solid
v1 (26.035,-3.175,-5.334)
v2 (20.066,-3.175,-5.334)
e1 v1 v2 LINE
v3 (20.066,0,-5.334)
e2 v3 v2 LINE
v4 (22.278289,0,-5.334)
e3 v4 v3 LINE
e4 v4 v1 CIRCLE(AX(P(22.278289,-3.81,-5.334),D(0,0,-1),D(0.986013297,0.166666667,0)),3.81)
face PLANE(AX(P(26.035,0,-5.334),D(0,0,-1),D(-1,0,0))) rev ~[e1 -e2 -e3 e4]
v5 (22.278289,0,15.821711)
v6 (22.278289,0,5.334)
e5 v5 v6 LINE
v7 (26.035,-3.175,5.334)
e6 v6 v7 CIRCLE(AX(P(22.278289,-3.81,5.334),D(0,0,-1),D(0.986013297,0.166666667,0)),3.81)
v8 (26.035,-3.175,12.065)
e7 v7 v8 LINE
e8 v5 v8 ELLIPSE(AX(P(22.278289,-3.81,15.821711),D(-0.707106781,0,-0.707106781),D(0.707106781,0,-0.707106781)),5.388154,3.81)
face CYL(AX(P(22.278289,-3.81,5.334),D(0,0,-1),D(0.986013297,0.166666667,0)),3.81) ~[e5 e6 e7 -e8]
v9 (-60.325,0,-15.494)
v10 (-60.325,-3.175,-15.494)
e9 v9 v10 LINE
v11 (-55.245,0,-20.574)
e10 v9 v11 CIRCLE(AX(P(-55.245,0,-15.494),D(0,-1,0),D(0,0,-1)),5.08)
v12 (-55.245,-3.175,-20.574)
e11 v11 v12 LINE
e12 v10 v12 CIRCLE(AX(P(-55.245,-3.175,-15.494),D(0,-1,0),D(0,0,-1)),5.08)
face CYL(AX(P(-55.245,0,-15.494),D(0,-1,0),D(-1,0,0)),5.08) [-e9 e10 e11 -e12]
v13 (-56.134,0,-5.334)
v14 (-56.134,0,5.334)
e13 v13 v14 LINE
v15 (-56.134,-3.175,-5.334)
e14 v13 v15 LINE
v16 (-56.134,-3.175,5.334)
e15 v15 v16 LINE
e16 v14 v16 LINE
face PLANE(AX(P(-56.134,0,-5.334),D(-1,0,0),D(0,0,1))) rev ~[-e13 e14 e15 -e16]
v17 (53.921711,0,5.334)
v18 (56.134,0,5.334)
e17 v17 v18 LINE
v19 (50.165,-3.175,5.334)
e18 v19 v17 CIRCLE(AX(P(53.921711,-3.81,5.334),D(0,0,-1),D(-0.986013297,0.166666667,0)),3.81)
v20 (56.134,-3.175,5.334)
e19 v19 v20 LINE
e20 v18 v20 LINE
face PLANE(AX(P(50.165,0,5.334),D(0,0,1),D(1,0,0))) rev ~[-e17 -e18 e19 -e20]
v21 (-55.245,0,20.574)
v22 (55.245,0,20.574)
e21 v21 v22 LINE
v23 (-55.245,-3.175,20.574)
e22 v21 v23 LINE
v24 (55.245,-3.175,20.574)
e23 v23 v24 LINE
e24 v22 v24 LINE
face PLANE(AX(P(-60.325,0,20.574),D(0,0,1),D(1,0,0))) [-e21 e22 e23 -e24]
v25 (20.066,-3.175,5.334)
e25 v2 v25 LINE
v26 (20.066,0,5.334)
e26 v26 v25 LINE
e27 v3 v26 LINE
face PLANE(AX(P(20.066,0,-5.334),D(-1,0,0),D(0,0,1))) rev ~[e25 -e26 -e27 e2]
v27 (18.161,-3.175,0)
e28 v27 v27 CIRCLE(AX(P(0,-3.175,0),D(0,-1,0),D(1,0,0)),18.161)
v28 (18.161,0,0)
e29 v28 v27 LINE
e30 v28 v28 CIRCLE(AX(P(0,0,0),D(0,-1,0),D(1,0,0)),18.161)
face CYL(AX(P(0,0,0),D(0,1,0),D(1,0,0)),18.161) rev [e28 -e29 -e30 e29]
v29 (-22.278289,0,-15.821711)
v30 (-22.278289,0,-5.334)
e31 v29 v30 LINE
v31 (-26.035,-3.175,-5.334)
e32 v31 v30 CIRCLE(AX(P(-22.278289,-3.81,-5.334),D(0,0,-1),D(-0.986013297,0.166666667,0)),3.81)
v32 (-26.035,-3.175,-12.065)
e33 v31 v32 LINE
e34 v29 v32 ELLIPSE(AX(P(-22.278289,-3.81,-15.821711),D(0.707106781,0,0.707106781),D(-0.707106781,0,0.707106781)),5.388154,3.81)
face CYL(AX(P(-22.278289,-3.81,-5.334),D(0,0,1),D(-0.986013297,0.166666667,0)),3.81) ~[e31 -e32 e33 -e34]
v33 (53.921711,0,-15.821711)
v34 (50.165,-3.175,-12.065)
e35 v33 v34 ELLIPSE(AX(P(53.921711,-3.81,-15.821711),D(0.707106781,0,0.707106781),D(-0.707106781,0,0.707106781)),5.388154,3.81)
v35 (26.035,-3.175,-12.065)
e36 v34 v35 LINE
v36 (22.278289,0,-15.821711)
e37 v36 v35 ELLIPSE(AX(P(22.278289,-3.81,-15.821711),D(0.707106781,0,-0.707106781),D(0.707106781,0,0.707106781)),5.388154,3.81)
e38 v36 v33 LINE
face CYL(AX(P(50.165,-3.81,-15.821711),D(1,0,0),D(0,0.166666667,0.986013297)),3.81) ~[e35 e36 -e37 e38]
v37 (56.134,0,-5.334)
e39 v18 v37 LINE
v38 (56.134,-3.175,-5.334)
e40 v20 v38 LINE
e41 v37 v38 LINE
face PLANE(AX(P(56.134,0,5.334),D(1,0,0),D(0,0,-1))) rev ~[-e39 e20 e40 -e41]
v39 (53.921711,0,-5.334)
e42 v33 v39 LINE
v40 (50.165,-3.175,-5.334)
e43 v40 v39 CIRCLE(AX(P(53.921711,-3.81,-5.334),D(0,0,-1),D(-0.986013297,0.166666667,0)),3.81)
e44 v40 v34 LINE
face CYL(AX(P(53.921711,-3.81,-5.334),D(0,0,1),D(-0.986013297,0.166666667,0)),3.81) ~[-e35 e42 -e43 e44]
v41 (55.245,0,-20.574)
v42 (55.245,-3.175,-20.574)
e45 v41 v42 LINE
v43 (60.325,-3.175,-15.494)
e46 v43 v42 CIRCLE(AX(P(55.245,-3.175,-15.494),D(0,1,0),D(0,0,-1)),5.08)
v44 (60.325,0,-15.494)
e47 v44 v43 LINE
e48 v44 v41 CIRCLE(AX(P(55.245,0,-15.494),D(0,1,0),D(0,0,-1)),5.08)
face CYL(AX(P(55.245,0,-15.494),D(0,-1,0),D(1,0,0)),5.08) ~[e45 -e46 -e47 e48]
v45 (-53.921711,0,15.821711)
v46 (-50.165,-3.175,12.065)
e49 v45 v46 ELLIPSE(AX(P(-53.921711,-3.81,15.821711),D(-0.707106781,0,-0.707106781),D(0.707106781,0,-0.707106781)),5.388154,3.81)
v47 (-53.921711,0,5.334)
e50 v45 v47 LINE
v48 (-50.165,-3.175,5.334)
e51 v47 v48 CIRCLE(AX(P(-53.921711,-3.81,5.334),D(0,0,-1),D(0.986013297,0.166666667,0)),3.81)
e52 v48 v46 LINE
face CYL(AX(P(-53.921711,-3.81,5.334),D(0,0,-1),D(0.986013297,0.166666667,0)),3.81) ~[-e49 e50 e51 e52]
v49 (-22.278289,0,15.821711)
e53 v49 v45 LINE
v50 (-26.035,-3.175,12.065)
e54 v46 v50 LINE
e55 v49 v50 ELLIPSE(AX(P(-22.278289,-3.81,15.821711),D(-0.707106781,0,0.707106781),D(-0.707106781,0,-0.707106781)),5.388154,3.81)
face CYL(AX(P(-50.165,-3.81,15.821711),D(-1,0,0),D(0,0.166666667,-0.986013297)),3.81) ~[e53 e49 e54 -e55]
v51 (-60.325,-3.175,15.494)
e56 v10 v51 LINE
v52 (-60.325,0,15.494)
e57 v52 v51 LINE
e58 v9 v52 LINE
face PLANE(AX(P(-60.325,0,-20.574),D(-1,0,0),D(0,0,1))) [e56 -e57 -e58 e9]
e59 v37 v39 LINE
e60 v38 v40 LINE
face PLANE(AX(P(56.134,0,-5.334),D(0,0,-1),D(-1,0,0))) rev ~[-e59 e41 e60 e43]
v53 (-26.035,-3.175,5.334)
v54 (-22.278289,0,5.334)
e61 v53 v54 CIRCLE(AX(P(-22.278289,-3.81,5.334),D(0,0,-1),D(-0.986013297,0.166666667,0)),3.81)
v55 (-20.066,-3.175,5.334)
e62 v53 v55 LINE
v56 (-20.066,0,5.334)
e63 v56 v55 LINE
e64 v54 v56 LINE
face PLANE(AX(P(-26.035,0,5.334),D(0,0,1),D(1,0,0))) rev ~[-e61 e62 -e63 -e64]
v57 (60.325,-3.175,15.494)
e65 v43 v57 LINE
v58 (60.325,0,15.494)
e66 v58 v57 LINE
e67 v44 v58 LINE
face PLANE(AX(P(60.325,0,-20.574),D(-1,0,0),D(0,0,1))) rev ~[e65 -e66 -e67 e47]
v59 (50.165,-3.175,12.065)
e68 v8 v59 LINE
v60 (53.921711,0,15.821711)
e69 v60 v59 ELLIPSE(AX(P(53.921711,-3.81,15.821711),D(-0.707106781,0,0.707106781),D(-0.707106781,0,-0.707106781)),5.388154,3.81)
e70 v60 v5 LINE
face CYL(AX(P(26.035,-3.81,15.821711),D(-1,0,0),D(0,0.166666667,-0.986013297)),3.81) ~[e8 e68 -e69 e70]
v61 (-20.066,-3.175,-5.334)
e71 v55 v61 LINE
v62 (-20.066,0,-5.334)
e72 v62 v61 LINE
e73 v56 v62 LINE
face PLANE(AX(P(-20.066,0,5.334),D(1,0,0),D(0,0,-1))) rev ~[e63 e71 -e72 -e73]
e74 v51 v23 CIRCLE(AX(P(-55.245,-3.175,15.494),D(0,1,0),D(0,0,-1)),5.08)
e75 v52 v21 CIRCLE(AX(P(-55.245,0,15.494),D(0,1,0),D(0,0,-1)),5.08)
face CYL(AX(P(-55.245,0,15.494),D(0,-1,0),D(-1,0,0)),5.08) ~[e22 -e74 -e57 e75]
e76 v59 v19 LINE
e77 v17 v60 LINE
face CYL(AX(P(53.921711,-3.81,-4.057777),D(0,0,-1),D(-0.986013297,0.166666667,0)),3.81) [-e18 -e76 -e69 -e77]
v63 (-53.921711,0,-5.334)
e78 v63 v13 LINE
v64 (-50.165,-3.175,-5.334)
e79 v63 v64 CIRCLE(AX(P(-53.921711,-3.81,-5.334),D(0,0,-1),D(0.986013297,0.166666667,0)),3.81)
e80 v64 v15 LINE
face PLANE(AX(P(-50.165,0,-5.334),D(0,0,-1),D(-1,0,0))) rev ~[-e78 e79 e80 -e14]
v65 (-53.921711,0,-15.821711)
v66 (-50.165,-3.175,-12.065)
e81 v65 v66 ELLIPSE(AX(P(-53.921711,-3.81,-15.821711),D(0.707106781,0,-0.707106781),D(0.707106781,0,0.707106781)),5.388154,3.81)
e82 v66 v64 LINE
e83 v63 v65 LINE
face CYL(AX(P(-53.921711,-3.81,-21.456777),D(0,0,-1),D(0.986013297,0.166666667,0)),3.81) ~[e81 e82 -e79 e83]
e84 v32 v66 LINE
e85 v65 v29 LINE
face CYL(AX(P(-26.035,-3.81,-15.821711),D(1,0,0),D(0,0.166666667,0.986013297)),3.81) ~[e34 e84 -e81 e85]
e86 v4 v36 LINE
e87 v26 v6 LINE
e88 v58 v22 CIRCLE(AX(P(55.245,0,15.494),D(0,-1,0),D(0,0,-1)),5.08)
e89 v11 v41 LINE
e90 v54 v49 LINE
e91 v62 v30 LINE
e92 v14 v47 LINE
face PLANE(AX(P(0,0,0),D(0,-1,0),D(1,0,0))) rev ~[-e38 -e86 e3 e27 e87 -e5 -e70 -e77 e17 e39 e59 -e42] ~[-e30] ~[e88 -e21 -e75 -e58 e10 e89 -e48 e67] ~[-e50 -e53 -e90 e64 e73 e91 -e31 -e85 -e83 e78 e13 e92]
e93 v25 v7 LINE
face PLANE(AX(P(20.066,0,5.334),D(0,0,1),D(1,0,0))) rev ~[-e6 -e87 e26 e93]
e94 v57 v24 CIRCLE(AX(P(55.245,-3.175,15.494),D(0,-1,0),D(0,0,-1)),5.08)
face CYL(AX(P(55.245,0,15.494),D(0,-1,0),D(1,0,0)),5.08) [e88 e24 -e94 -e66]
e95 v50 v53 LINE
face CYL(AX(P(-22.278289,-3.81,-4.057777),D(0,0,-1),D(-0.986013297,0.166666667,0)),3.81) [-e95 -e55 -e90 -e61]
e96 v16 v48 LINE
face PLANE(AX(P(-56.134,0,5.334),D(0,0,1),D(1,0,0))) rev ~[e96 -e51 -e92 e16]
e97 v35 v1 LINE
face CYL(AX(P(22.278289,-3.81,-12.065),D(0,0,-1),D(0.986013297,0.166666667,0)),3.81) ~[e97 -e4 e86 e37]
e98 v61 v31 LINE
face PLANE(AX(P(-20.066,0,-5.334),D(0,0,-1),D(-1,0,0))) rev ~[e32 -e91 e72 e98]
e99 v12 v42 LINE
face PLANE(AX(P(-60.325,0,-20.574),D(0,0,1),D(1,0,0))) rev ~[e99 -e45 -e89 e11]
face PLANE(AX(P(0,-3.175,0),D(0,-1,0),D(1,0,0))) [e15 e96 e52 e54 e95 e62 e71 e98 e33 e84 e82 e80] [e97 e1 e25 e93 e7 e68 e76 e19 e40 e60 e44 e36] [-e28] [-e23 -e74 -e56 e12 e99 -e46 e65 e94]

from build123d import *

# Parameters (mm, degrees)
F0_W          = 120.65
F0_H          = 41.148
F0_R          = 18.161
F1_DEPTH      = 3.175
F2_T1_DEPTH   = 24.13
F2_T3_DEPTH   = 16.1227766557
F2_T5_DEPTH   = 24.13
F2_T7_DEPTH   = 16.1227766557
F2_T13_DEPTH  = 16.1227766557
F2_T18_DEPTH  = 33.5217766557
F2_T25_DEPTH  = 33.5217766557
F2_T29_DEPTH  = 16.1227766557
F2_T37_DEPTH  = 33.5217766557
F2_T41_DEPTH  = 16.1227766557
F2_T49_DEPTH  = 16.1227766557
F2_T54_DEPTH  = 33.5217766557
F2_T61_DEPTH  = 33.5217766557
F2_T65_DEPTH  = 16.1227766557
F2_T73_DEPTH  = 16.1227766557
F2_T78_DEPTH  = 33.5217766557
F2_T85_DEPTH  = 33.5217766557
F2_T89_DEPTH  = 16.1227766557
F2_T97_DEPTH  = 16.1227766557
F2_T102_DEPTH = 33.5217766557
F3_R          = 5.08


# Not quite as in the source:
# - a fillet or chamfer that OpenCascade refuses, or shapes differently, is made with other operations: its cross-section is extruded or revolved along the edge and cut away or added
# - a feature names something its author has since deleted; it is built from what else it names


with BuildPart() as f1:
    # F0 (on Front) → F1 (new body)
    with BuildSketch(Plane.XZ):
        Rectangle(F0_W, F0_H)
        Polygon((-26.035, 5.334), (-20.066, 5.334), (-20.066, -5.334), (-26.035, -5.334), (-26.035, -12.065), (-50.165, -12.065), (-50.165, -5.334), (-56.134, -5.334), (-56.134, 5.334), (-50.165, 5.334), (-50.165, 12.065), (-26.035, 12.065), align=None, mode=Mode.SUBTRACT)
        Circle(F0_R, mode=Mode.SUBTRACT)
        Polygon((50.165, 5.334), (56.134, 5.334), (56.134, -5.334), (50.165, -5.334), (50.165, -12.065), (26.035, -12.065), (26.035, -5.334), (20.066, -5.334), (20.066, 5.334), (26.035, 5.334), (26.035, 12.065), (50.165, 12.065), align=None, mode=Mode.SUBTRACT)
    extrude(amount=F1_DEPTH)

    # F2: fillet of radius 3.81 on 12 edges, made by hand

    # F2_s2 → F2_t1 (cut)
    with BuildSketch(Plane.YZ.offset(26.035)):
        with BuildLine():
            ThreePointArc((-3.175, 12.065), (-0.9000644337, 13.3623662374), (0, 15.8217106623))
            Line((0, 15.8217106623), (0, 12.065))
            Line((0, 12.065), (-3.175, 12.065))
        make_face()
        with BuildLine():
            ThreePointArc((-3.175, -12.065), (-0.9000644337, -13.3623662374), (0, -15.8217106623))
            Line((0, -15.8217106623), (0, -12.065))
            Line((0, -12.065), (-3.175, -12.065))
        make_face()
    extrude(amount=F2_T1_DEPTH, mode=Mode.SUBTRACT)

    # F2_s4 → F2_t3 (cut)
    with BuildSketch(Plane.XY.offset(-4.0577766557)):
        with BuildLine():
            ThreePointArc((26.035, -3.175), (24.7376337626, -0.9000644337), (22.2782893377, 0))
            Line((22.2782893377, 0), (26.035, 0))
            Line((26.035, 0), (26.035, -3.175))
        make_face()
        with BuildLine():
            ThreePointArc((50.165, -3.175), (51.4623662374, -0.9000644337), (53.9217106623, 0))
            Line((53.9217106623, 0), (50.165, 0))
            Line((50.165, 0), (50.165, -3.175))
        make_face()
        with BuildLine():
            ThreePointArc((-26.035, -3.175), (-24.7376337626, -0.9000644337), (-22.2782893377, 0))
            Line((-22.2782893377, 0), (-26.035, 0))
            Line((-26.035, 0), (-26.035, -3.175))
        make_face()
        with BuildLine():
            ThreePointArc((-50.165, -3.175), (-51.4623662374, -0.9000644337), (-53.9217106623, 0))
            Line((-53.9217106623, 0), (-50.165, 0))
            Line((-50.165, 0), (-50.165, -3.175))
        make_face()
    extrude(amount=F2_T3_DEPTH, mode=Mode.SUBTRACT)

    # F2_s6 → F2_t5 (cut)
    with BuildSketch(Plane.YZ.offset(-50.165)):
        with BuildLine():
            ThreePointArc((-3.175, 12.065), (-0.9000644337, 13.3623662374), (0, 15.8217106623))
            Line((0, 15.8217106623), (0, 12.065))
            Line((0, 12.065), (-3.175, 12.065))
        make_face()
        with BuildLine():
            ThreePointArc((-3.175, -12.065), (-0.9000644337, -13.3623662374), (0, -15.8217106623))
            Line((0, -15.8217106623), (0, -12.065))
            Line((0, -12.065), (-3.175, -12.065))
        make_face()
    extrude(amount=F2_T5_DEPTH, mode=Mode.SUBTRACT)

    # F2_s8 → F2_t7 (cut)
    with BuildSketch(Plane.XY.offset(-12.065)):
        with BuildLine():
            ThreePointArc((-50.165, -3.175), (-51.4623662374, -0.9000644337), (-53.9217106623, 0))
            Line((-53.9217106623, 0), (-50.165, 0))
            Line((-50.165, 0), (-50.165, -3.175))
        make_face()
        with BuildLine():
            ThreePointArc((-26.035, -3.175), (-24.7376337626, -0.9000644337), (-22.2782893377, 0))
            Line((-22.2782893377, 0), (-26.035, 0))
            Line((-26.035, 0), (-26.035, -3.175))
        make_face()
        with BuildLine():
            ThreePointArc((26.035, -3.175), (24.7376337626, -0.9000644337), (22.2782893377, 0))
            Line((22.2782893377, 0), (26.035, 0))
            Line((26.035, 0), (26.035, -3.175))
        make_face()
        with BuildLine():
            ThreePointArc((50.165, -3.175), (51.4623662374, -0.9000644337), (53.9217106623, 0))
            Line((53.9217106623, 0), (50.165, 0))
            Line((50.165, 0), (50.165, -3.175))
        make_face()
    extrude(amount=F2_T7_DEPTH, mode=Mode.SUBTRACT)


with BuildPart() as f2_tool11:
    # F2_s12 → F2_t13 (new body)
    with BuildSketch(Plane.XY.offset(5.334)):
        with BuildLine():
            ThreePointArc((26.035, -3.175), (24.7376337626, -0.9000644337), (22.2782893377, 0))
            Line((22.2782893377, 0), (26.035, 0))
            Line((26.035, 0), (26.035, -3.175))
        make_face()
    extrude(amount=F2_T13_DEPTH)

    split(bisect_by=Plane.XY.offset(20.574), keep=Keep.BOTTOM)

    split(bisect_by=Plane.XY.offset(12.065), keep=Keep.TOP)


with BuildPart() as f2_tool16:
    # F2_s17 → F2_t18 (new body)
    with BuildSketch(Plane.YZ.offset(16.6432233443)):
        with BuildLine():
            ThreePointArc((-3.175, 12.065), (-0.9000644337, 13.3623662374), (0, 15.8217106623))
            Line((0, 15.8217106623), (0, 12.065))
            Line((0, 12.065), (-3.175, 12.065))
        make_face()
    extrude(amount=F2_T18_DEPTH)

    split(bisect_by=Plane.YZ.offset(26.035), keep=Keep.BOTTOM)


with BuildPart() as f2_tool11_1:
    add(f2_tool11.part)

    # F2_t20: intersect F2_tool16
    add(f2_tool16.part, mode=Mode.INTERSECT)


with BuildPart() as f1_1:
    add(f1.part)

    # F2_t9: cut F2_tool11
    add(f2_tool11_1.part, mode=Mode.SUBTRACT)


with BuildPart() as f2_tool23:
    # F2_s24 → F2_t25 (new body)
    with BuildSketch(Plane.YZ.offset(26.035)):
        with BuildLine():
            ThreePointArc((-3.175, 12.065), (-0.9000644337, 13.3623662374), (0, 15.8217106623))
            Line((0, 15.8217106623), (0, 12.065))
            Line((0, 12.065), (-3.175, 12.065))
        make_face()
    extrude(amount=F2_T25_DEPTH)

    split(bisect_by=Plane.YZ.offset(50.165), keep=Keep.TOP)


with BuildPart() as f2_tool27:
    # F2_s28 → F2_t29 (new body)
    with BuildSketch(Plane.XY.offset(21.4567766557)):
        with BuildLine():
            ThreePointArc((50.165, -3.175), (51.4623662374, -0.9000644337), (53.9217106623, 0))
            Line((53.9217106623, 0), (50.165, 0))
            Line((50.165, 0), (50.165, -3.175))
        make_face()
    extrude(amount=-F2_T29_DEPTH)

    split(bisect_by=Plane.XY.offset(20.574), keep=Keep.BOTTOM)

    split(bisect_by=Plane.XY.offset(12.065), keep=Keep.TOP)


with BuildPart() as f2_tool23_1:
    add(f2_tool23.part)

    # F2_t32: intersect F2_tool27
    add(f2_tool27.part, mode=Mode.INTERSECT)


with BuildPart() as f1_2:
    add(f1_1.part)

    # F2_t21: cut F2_tool23
    add(f2_tool23_1.part, mode=Mode.SUBTRACT)


with BuildPart() as f2_tool35:
    # F2_s36 → F2_t37 (new body)
    with BuildSketch(Plane.YZ.offset(-50.165)):
        with BuildLine():
            ThreePointArc((-3.175, 12.065), (-0.9000644337, 13.3623662374), (0, 15.8217106623))
            Line((0, 15.8217106623), (0, 12.065))
            Line((0, 12.065), (-3.175, 12.065))
        make_face()
    extrude(amount=F2_T37_DEPTH)

    split(bisect_by=Plane.YZ.offset(-26.035), keep=Keep.TOP)


with BuildPart() as f2_tool39:
    # F2_s40 → F2_t41 (new body)
    with BuildSketch(Plane.XY.offset(21.4567766557)):
        with BuildLine():
            ThreePointArc((-26.035, -3.175), (-24.7376337626, -0.9000644337), (-22.2782893377, 0))
            Line((-22.2782893377, 0), (-26.035, 0))
            Line((-26.035, 0), (-26.035, -3.175))
        make_face()
    extrude(amount=-F2_T41_DEPTH)

    split(bisect_by=Plane.XY.offset(20.574), keep=Keep.BOTTOM)

    split(bisect_by=Plane.XY.offset(12.065), keep=Keep.TOP)


with BuildPart() as f2_tool35_1:
    add(f2_tool35.part)

    # F2_t44: intersect F2_tool39
    add(f2_tool39.part, mode=Mode.INTERSECT)


with BuildPart() as f1_3:
    add(f1_2.part)

    # F2_t33: cut F2_tool35
    add(f2_tool35_1.part, mode=Mode.SUBTRACT)


with BuildPart() as f2_tool47:
    # F2_s48 → F2_t49 (new body)
    with BuildSketch(Plane.XY.offset(5.334)):
        with BuildLine():
            ThreePointArc((-50.165, -3.175), (-51.4623662374, -0.9000644337), (-53.9217106623, 0))
            Line((-53.9217106623, 0), (-50.165, 0))
            Line((-50.165, 0), (-50.165, -3.175))
        make_face()
    extrude(amount=F2_T49_DEPTH)

    split(bisect_by=Plane.XY.offset(20.574), keep=Keep.BOTTOM)

    split(bisect_by=Plane.XY.offset(12.065), keep=Keep.TOP)


with BuildPart() as f2_tool52:
    # F2_s53 → F2_t54 (new body)
    with BuildSketch(Plane.YZ.offset(-59.5567766557)):
        with BuildLine():
            ThreePointArc((-3.175, 12.065), (-0.9000644337, 13.3623662374), (0, 15.8217106623))
            Line((0, 15.8217106623), (0, 12.065))
            Line((0, 12.065), (-3.175, 12.065))
        make_face()
    extrude(amount=F2_T54_DEPTH)

    split(bisect_by=Plane.YZ.offset(-50.165), keep=Keep.BOTTOM)


with BuildPart() as f2_tool47_1:
    add(f2_tool47.part)

    # F2_t56: intersect F2_tool52
    add(f2_tool52.part, mode=Mode.INTERSECT)


with BuildPart() as f1_4:
    add(f1_3.part)

    # F2_t45: cut F2_tool47
    add(f2_tool47_1.part, mode=Mode.SUBTRACT)


with BuildPart() as f2_tool59:
    # F2_s60 → F2_t61 (new body)
    with BuildSketch(Plane.YZ.offset(-26.035)):
        with BuildLine():
            ThreePointArc((-3.175, -12.065), (-0.9000644337, -13.3623662374), (0, -15.8217106623))
            Line((0, -15.8217106623), (0, -12.065))
            Line((0, -12.065), (-3.175, -12.065))
        make_face()
    extrude(amount=-F2_T61_DEPTH)

    split(bisect_by=Plane.YZ.offset(-50.165), keep=Keep.BOTTOM)


with BuildPart() as f2_tool63:
    # F2_s64 → F2_t65 (new body)
    with BuildSketch(Plane.XY.offset(-21.4567766557)):
        with BuildLine():
            ThreePointArc((-50.165, -3.175), (-51.4623662374, -0.9000644337), (-53.9217106623, 0))
            Line((-53.9217106623, 0), (-50.165, 0))
            Line((-50.165, 0), (-50.165, -3.175))
        make_face()
    extrude(amount=F2_T65_DEPTH)

    split(bisect_by=Plane.XY.offset(-20.574), keep=Keep.TOP)

    split(bisect_by=Plane.XY.offset(-12.065), keep=Keep.BOTTOM)


with BuildPart() as f2_tool59_1:
    add(f2_tool59.part)

    # F2_t68: intersect F2_tool63
    add(f2_tool63.part, mode=Mode.INTERSECT)


with BuildPart() as f1_5:
    add(f1_4.part)

    # F2_t57: cut F2_tool59
    add(f2_tool59_1.part, mode=Mode.SUBTRACT)


with BuildPart() as f2_tool71:
    # F2_s72 → F2_t73 (new body)
    with BuildSketch(Plane.XY.offset(-5.334)):
        with BuildLine():
            ThreePointArc((-26.035, -3.175), (-24.7376337626, -0.9000644337), (-22.2782893377, 0))
            Line((-22.2782893377, 0), (-26.035, 0))
            Line((-26.035, 0), (-26.035, -3.175))
        make_face()
    extrude(amount=-F2_T73_DEPTH)

    split(bisect_by=Plane.XY.offset(-20.574), keep=Keep.TOP)

    split(bisect_by=Plane.XY.offset(-12.065), keep=Keep.BOTTOM)


with BuildPart() as f2_tool76:
    # F2_s77 → F2_t78 (new body)
    with BuildSketch(Plane.YZ.offset(-16.6432233443)):
        with BuildLine():
            ThreePointArc((-3.175, -12.065), (-0.9000644337, -13.3623662374), (0, -15.8217106623))
            Line((0, -15.8217106623), (0, -12.065))
            Line((0, -12.065), (-3.175, -12.065))
        make_face()
    extrude(amount=-F2_T78_DEPTH)

    split(bisect_by=Plane.YZ.offset(-26.035), keep=Keep.TOP)


with BuildPart() as f2_tool71_1:
    add(f2_tool71.part)

    # F2_t80: intersect F2_tool76
    add(f2_tool76.part, mode=Mode.INTERSECT)


with BuildPart() as f1_6:
    add(f1_5.part)

    # F2_t69: cut F2_tool71
    add(f2_tool71_1.part, mode=Mode.SUBTRACT)


with BuildPart() as f2_tool83:
    # F2_s84 → F2_t85 (new body)
    with BuildSketch(Plane.YZ.offset(50.165)):
        with BuildLine():
            ThreePointArc((-3.175, -12.065), (-0.9000644337, -13.3623662374), (0, -15.8217106623))
            Line((0, -15.8217106623), (0, -12.065))
            Line((0, -12.065), (-3.175, -12.065))
        make_face()
    extrude(amount=-F2_T85_DEPTH)

    split(bisect_by=Plane.YZ.offset(26.035), keep=Keep.BOTTOM)


with BuildPart() as f2_tool87:
    # F2_s88 → F2_t89 (new body)
    with BuildSketch(Plane.XY.offset(-21.4567766557)):
        with BuildLine():
            ThreePointArc((26.035, -3.175), (24.7376337626, -0.9000644337), (22.2782893377, 0))
            Line((22.2782893377, 0), (26.035, 0))
            Line((26.035, 0), (26.035, -3.175))
        make_face()
    extrude(amount=F2_T89_DEPTH)

    split(bisect_by=Plane.XY.offset(-20.574), keep=Keep.TOP)

    split(bisect_by=Plane.XY.offset(-12.065), keep=Keep.BOTTOM)


with BuildPart() as f2_tool83_1:
    add(f2_tool83.part)

    # F2_t92: intersect F2_tool87
    add(f2_tool87.part, mode=Mode.INTERSECT)


with BuildPart() as f1_7:
    add(f1_6.part)

    # F2_t81: cut F2_tool83
    add(f2_tool83_1.part, mode=Mode.SUBTRACT)


with BuildPart() as f2_tool95:
    # F2_s96 → F2_t97 (new body)
    with BuildSketch(Plane.XY.offset(-5.334)):
        with BuildLine():
            ThreePointArc((50.165, -3.175), (51.4623662374, -0.9000644337), (53.9217106623, 0))
            Line((53.9217106623, 0), (50.165, 0))
            Line((50.165, 0), (50.165, -3.175))
        make_face()
    extrude(amount=-F2_T97_DEPTH)

    split(bisect_by=Plane.XY.offset(-20.574), keep=Keep.TOP)

    split(bisect_by=Plane.XY.offset(-12.065), keep=Keep.BOTTOM)


with BuildPart() as f2_tool100:
    # F2_s101 → F2_t102 (new body)
    with BuildSketch(Plane.YZ.offset(59.5567766557)):
        with BuildLine():
            ThreePointArc((-3.175, -12.065), (-0.9000644337, -13.3623662374), (0, -15.8217106623))
            Line((0, -15.8217106623), (0, -12.065))
            Line((0, -12.065), (-3.175, -12.065))
        make_face()
    extrude(amount=-F2_T102_DEPTH)

    split(bisect_by=Plane.YZ.offset(50.165), keep=Keep.TOP)


with BuildPart() as f2_tool95_1:
    add(f2_tool95.part)

    # F2_t104: intersect F2_tool100
    add(f2_tool100.part, mode=Mode.INTERSECT)


with BuildPart() as f1_8:
    add(f1_7.part)

    # F2_t93: cut F2_tool95
    add(f2_tool95_1.part, mode=Mode.SUBTRACT)

    # F3
    f3_edges = [f1_8.edges().sort_by_distance(p)[0] for p in [
        (60.325, -1.5875, 20.574),
        (-60.325, -1.5875, 20.574),
        (-60.325, -1.5875, -20.574),
        (60.325, -1.5875, -20.574),
    ]]
    fillet(f3_edges, radius=F3_R)


solid = f1_8.part
